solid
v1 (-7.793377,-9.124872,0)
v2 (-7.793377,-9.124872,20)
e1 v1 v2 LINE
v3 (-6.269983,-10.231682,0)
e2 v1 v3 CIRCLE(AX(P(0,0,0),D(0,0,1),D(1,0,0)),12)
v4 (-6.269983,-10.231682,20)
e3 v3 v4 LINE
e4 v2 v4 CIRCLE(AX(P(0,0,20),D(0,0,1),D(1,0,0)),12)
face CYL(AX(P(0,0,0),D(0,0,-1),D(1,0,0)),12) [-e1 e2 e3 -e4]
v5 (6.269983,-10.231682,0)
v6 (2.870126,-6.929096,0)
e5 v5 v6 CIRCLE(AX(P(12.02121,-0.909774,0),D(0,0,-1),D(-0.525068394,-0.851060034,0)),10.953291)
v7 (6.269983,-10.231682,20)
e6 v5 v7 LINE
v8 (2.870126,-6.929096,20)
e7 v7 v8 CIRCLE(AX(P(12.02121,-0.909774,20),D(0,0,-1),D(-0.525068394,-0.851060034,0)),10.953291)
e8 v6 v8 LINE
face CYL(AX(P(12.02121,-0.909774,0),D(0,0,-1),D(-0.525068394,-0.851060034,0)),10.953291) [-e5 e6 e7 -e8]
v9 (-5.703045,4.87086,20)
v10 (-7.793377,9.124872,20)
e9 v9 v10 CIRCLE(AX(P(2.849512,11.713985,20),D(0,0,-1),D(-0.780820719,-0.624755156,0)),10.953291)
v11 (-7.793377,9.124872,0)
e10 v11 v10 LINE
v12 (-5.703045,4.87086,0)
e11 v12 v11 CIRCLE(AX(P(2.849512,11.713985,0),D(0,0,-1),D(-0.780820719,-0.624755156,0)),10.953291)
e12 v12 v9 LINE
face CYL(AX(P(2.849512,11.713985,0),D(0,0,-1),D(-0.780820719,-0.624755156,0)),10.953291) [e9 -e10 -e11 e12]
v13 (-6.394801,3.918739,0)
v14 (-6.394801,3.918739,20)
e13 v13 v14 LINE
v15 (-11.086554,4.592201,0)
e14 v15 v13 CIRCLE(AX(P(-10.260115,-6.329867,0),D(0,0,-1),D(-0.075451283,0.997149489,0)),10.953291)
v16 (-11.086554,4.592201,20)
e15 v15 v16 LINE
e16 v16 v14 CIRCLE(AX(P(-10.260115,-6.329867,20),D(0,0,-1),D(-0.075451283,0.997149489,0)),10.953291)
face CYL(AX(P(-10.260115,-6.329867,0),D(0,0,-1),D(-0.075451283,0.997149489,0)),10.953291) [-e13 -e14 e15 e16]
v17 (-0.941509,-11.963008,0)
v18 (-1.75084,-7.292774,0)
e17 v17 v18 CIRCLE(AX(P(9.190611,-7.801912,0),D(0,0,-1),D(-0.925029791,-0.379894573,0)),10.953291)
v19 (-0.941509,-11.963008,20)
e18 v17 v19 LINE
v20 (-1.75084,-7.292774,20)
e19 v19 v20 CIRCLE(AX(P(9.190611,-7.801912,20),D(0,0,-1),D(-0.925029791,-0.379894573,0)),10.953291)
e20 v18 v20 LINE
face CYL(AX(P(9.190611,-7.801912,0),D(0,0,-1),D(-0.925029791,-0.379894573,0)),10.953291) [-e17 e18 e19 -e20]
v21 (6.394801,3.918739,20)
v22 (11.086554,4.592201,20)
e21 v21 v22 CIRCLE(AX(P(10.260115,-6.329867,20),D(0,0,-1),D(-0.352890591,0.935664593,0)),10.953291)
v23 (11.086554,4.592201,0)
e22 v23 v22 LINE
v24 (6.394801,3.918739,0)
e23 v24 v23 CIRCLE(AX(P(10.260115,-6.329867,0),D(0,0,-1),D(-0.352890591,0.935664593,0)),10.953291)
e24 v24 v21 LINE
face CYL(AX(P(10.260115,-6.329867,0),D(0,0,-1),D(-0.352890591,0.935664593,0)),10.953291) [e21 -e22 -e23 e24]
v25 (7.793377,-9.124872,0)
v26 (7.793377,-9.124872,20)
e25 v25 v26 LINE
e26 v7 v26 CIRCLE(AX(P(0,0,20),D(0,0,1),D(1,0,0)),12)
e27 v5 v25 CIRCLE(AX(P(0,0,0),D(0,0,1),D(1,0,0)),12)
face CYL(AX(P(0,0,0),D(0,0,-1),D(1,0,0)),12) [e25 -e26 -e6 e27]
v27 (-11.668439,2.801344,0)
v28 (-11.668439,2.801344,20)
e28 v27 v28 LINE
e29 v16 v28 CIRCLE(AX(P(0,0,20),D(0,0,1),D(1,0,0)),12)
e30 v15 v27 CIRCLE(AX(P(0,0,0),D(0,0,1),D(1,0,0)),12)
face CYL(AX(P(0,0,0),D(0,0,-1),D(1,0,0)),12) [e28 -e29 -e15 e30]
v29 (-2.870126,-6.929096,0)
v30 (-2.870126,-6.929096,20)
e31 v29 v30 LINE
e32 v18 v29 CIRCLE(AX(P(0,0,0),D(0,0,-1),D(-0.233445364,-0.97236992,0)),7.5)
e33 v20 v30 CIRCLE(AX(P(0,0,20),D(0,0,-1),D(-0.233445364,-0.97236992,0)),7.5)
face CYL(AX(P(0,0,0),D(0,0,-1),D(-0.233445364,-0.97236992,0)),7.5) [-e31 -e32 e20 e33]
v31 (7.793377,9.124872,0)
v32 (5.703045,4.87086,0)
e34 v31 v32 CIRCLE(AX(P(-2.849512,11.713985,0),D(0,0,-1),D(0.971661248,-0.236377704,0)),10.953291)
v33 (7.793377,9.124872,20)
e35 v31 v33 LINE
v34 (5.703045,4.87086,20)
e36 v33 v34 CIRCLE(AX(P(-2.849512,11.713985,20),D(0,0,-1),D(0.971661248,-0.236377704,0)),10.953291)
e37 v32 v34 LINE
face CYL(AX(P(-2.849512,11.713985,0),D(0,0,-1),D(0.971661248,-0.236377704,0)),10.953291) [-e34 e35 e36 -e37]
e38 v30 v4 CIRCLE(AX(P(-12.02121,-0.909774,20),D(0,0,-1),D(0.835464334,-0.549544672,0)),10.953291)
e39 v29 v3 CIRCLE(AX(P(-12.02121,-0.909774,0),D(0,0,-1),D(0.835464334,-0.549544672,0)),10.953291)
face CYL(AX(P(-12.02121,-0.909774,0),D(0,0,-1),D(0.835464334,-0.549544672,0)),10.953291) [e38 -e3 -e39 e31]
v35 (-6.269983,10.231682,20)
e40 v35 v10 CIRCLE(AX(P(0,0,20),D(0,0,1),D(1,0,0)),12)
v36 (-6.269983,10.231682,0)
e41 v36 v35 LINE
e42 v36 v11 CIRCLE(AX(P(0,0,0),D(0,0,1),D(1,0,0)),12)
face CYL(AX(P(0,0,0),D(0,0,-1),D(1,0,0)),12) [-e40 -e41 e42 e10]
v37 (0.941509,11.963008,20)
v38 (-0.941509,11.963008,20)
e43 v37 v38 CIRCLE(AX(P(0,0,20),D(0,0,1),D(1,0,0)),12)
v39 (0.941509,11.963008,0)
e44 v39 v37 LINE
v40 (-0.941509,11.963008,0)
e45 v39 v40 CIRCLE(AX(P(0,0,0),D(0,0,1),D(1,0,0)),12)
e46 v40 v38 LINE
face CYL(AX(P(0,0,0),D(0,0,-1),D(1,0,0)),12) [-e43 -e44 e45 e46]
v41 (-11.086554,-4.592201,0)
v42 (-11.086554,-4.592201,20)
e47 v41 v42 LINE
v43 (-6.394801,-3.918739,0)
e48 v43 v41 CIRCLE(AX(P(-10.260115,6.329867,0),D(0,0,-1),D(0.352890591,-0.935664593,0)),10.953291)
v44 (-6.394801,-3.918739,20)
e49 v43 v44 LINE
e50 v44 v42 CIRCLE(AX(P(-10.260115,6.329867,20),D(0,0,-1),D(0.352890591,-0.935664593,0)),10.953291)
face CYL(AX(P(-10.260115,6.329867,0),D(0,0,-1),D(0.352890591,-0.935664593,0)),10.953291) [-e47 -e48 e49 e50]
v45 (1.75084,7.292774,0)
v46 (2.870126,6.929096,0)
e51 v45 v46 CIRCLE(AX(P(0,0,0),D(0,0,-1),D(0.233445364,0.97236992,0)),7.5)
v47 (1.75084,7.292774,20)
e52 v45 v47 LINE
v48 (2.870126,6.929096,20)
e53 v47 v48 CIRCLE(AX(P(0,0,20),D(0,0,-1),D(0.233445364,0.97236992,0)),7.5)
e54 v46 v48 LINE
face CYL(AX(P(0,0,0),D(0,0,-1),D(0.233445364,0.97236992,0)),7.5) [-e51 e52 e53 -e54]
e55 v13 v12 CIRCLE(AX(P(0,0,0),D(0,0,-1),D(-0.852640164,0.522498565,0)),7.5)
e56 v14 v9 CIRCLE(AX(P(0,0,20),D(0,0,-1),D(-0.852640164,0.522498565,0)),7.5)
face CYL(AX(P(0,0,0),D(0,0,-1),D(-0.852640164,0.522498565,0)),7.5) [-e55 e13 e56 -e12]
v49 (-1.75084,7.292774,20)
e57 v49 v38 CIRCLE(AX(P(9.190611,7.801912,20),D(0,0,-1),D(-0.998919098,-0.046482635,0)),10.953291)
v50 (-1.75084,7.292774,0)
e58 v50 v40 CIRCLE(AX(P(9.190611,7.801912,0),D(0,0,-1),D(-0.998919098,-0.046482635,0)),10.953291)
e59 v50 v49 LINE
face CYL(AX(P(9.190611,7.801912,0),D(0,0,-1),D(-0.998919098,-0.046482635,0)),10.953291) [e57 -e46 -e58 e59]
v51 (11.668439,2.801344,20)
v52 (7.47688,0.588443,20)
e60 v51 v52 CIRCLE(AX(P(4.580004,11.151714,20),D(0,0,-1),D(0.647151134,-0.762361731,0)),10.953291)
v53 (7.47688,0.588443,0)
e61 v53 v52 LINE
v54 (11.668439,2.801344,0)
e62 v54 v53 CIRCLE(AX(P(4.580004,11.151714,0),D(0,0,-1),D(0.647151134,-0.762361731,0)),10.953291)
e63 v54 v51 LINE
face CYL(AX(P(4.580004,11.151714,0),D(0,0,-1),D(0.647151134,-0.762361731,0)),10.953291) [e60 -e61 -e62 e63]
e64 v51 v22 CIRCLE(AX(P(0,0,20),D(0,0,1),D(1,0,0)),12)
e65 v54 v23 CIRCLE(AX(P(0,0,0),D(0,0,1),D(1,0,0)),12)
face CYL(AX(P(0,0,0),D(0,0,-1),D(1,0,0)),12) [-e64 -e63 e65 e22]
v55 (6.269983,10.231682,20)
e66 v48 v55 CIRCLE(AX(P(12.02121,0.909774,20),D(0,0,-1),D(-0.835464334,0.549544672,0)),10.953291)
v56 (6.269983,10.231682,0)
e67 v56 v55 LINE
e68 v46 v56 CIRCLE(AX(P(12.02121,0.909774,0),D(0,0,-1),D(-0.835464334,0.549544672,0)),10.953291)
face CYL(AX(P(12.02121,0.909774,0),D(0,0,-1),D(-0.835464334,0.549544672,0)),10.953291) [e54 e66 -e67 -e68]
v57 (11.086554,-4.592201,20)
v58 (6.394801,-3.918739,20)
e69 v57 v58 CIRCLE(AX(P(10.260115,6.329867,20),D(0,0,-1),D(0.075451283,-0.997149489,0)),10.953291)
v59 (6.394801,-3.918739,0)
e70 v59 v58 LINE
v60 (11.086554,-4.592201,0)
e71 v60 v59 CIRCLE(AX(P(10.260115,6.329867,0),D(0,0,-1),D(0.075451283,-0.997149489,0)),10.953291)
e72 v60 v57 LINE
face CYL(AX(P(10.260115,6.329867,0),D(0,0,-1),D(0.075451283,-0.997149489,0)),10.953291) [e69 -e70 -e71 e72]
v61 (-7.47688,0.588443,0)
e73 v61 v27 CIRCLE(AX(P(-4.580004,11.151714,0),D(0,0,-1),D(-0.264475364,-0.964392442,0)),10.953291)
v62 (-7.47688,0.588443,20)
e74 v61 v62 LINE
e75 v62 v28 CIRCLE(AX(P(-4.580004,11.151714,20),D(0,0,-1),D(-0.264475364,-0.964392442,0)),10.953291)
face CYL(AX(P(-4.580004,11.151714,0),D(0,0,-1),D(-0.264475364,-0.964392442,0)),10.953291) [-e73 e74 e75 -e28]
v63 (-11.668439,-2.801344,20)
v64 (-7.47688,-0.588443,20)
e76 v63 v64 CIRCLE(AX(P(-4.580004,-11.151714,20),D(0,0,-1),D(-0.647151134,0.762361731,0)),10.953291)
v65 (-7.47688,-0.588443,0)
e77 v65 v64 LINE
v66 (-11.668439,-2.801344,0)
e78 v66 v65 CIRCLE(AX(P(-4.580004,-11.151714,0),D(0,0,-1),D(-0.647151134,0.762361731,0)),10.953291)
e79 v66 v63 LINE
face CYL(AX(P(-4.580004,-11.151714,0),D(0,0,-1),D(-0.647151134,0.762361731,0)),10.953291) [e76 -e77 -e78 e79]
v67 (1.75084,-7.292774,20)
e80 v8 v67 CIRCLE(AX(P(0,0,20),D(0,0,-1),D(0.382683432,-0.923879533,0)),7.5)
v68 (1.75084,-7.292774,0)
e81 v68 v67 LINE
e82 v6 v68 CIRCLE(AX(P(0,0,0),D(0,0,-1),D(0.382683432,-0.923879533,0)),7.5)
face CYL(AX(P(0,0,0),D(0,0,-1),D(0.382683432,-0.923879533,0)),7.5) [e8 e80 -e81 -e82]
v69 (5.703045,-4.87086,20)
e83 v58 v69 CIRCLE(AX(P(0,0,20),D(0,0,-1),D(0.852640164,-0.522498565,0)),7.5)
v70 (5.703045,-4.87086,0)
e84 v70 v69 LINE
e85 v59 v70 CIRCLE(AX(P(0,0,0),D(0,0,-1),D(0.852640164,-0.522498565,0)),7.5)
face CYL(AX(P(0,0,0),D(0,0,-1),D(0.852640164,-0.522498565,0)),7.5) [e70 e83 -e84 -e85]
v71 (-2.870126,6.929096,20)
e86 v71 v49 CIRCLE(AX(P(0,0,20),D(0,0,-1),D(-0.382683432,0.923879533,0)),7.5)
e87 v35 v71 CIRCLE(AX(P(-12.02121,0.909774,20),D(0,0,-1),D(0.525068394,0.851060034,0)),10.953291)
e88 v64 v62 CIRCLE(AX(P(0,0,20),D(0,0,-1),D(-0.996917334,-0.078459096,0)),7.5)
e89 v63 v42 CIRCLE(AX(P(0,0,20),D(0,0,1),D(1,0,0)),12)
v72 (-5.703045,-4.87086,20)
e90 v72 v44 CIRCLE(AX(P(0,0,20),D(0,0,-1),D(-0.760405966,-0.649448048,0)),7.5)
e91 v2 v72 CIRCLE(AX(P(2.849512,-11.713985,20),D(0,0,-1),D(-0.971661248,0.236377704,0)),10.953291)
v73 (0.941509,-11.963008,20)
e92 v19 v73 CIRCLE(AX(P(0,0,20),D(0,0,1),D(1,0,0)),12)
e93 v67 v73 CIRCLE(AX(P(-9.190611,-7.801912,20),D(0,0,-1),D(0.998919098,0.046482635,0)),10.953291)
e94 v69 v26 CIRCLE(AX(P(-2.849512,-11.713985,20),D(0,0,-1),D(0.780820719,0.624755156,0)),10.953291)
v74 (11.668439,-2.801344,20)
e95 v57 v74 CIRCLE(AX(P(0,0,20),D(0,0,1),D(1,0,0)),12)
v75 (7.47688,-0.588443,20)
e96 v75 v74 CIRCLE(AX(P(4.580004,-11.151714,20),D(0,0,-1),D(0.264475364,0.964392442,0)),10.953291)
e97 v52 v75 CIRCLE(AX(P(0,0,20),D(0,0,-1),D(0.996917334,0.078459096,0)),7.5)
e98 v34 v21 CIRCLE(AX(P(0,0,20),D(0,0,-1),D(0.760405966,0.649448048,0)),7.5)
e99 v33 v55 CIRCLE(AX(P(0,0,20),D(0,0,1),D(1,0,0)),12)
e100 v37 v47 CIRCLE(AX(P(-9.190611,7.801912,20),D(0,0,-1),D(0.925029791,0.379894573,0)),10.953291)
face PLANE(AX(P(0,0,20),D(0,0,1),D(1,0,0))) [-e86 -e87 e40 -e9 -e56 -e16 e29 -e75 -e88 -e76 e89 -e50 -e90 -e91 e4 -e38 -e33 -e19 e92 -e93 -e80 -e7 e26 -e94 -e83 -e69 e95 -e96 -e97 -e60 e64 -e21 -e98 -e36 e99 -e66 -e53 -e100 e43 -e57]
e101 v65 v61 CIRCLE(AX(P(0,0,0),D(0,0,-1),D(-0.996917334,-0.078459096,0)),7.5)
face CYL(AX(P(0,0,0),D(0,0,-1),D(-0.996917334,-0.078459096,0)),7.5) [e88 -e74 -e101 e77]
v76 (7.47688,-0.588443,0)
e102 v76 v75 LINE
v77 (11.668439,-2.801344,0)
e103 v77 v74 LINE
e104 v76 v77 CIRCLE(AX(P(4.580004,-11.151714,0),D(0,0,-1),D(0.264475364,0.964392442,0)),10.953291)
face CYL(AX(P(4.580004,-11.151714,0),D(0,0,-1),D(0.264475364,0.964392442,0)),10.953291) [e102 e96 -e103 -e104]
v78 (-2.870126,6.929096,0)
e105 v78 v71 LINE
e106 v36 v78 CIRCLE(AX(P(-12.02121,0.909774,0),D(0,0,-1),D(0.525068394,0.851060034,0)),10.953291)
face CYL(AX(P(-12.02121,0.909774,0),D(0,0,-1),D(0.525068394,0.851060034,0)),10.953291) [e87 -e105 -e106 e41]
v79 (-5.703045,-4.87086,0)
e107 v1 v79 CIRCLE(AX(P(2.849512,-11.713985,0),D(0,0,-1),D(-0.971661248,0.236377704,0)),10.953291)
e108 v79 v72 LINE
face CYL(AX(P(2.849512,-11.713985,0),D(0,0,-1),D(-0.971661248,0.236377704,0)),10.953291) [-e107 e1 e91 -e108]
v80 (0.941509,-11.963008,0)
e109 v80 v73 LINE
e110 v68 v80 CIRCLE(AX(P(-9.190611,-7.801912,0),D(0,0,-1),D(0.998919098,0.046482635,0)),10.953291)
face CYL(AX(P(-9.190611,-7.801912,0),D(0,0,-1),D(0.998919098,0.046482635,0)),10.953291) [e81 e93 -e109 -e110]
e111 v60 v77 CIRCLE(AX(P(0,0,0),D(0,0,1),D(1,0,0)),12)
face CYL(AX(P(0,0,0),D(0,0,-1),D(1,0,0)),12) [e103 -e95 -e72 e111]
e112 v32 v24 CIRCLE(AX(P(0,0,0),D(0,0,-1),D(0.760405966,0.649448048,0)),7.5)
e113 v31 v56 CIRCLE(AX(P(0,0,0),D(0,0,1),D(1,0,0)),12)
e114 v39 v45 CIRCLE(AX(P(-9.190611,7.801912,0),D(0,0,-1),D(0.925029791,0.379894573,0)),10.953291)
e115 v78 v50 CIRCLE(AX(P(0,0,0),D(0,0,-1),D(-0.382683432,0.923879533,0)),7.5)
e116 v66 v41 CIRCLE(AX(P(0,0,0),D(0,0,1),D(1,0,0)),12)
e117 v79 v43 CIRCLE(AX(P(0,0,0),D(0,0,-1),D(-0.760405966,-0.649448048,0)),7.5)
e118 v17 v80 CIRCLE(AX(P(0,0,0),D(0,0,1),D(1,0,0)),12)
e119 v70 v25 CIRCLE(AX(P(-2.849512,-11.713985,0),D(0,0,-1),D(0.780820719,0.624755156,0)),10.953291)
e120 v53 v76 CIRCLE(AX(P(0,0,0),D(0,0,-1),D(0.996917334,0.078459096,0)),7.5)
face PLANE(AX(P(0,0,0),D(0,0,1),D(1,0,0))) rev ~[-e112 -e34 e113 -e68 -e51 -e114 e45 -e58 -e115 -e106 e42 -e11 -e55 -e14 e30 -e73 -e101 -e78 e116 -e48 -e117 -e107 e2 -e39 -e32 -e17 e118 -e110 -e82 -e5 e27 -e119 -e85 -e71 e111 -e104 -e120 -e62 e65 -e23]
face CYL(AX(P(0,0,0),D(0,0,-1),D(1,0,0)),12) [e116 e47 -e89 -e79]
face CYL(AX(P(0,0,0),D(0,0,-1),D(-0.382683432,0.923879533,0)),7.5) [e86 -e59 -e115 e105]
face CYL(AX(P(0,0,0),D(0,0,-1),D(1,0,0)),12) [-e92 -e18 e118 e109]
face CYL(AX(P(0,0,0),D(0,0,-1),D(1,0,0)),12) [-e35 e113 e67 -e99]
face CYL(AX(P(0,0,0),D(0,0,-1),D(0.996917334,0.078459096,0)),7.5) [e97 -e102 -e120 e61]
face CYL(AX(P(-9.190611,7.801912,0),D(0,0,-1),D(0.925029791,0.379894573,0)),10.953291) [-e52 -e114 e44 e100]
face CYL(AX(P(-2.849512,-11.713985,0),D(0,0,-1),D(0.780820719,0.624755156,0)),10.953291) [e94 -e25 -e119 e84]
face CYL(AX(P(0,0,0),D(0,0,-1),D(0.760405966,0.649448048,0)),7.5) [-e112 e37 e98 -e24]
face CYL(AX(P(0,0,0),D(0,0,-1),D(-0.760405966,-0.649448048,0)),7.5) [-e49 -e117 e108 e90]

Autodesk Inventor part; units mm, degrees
sketch "Sketch1" plane through (0, 0, 0) normal (0, 0, 1) x (1, 0, 0)
  circle A0 centre (0, 0) radius 12
  dimension "d0" = 24
extrude "Extrusion1" add sketch "Sketch1" along normal blind 20
ref_plane "Work Plane2" through (0, 0, 10) normal (0, 0, 1) x (1, 0, 0)
sketch "Sketch2" plane through (0, 0, 0) normal (0, 0, -1) x (-1, 0, 0)
  circle A0 centre (0, 0) radius 12 projected
  circle A1 centre (0, 0) radius 10
  dimension "d3" = 20
surface extrude "Средний диаметр" sketch "Sketch2" against normal through all shown no curves A1
ref_plane "Work Plane8" through (0, 0, 0) normal (0.9510565, 0.309017, 0) x (0, 0, 1)
ref_plane "Work Plane9" through (0, 0, 0) normal (1, 0, 0) x (0, 1, 0)
spur gear teeth "Цилиндрическое зубчатое зацепление" teeth 10 pitch diameter 20 tip diameter 24 root diameter 15 face width 20 start plane through (0, 0, 0) normal (0, 0, -1) x (-1, 0, 0)
equation "\"d0\" = da_da"
equation "\"d1\" = da_b"
equation "\"d3\" = da_dw"
equation "\"da_da\" = 24"
equation "\"da_b\" = 20"
equation "\"da_dw\" = 20"
properties part number "Цилиндрическое зубчатое зацепление1" material "Steel"
